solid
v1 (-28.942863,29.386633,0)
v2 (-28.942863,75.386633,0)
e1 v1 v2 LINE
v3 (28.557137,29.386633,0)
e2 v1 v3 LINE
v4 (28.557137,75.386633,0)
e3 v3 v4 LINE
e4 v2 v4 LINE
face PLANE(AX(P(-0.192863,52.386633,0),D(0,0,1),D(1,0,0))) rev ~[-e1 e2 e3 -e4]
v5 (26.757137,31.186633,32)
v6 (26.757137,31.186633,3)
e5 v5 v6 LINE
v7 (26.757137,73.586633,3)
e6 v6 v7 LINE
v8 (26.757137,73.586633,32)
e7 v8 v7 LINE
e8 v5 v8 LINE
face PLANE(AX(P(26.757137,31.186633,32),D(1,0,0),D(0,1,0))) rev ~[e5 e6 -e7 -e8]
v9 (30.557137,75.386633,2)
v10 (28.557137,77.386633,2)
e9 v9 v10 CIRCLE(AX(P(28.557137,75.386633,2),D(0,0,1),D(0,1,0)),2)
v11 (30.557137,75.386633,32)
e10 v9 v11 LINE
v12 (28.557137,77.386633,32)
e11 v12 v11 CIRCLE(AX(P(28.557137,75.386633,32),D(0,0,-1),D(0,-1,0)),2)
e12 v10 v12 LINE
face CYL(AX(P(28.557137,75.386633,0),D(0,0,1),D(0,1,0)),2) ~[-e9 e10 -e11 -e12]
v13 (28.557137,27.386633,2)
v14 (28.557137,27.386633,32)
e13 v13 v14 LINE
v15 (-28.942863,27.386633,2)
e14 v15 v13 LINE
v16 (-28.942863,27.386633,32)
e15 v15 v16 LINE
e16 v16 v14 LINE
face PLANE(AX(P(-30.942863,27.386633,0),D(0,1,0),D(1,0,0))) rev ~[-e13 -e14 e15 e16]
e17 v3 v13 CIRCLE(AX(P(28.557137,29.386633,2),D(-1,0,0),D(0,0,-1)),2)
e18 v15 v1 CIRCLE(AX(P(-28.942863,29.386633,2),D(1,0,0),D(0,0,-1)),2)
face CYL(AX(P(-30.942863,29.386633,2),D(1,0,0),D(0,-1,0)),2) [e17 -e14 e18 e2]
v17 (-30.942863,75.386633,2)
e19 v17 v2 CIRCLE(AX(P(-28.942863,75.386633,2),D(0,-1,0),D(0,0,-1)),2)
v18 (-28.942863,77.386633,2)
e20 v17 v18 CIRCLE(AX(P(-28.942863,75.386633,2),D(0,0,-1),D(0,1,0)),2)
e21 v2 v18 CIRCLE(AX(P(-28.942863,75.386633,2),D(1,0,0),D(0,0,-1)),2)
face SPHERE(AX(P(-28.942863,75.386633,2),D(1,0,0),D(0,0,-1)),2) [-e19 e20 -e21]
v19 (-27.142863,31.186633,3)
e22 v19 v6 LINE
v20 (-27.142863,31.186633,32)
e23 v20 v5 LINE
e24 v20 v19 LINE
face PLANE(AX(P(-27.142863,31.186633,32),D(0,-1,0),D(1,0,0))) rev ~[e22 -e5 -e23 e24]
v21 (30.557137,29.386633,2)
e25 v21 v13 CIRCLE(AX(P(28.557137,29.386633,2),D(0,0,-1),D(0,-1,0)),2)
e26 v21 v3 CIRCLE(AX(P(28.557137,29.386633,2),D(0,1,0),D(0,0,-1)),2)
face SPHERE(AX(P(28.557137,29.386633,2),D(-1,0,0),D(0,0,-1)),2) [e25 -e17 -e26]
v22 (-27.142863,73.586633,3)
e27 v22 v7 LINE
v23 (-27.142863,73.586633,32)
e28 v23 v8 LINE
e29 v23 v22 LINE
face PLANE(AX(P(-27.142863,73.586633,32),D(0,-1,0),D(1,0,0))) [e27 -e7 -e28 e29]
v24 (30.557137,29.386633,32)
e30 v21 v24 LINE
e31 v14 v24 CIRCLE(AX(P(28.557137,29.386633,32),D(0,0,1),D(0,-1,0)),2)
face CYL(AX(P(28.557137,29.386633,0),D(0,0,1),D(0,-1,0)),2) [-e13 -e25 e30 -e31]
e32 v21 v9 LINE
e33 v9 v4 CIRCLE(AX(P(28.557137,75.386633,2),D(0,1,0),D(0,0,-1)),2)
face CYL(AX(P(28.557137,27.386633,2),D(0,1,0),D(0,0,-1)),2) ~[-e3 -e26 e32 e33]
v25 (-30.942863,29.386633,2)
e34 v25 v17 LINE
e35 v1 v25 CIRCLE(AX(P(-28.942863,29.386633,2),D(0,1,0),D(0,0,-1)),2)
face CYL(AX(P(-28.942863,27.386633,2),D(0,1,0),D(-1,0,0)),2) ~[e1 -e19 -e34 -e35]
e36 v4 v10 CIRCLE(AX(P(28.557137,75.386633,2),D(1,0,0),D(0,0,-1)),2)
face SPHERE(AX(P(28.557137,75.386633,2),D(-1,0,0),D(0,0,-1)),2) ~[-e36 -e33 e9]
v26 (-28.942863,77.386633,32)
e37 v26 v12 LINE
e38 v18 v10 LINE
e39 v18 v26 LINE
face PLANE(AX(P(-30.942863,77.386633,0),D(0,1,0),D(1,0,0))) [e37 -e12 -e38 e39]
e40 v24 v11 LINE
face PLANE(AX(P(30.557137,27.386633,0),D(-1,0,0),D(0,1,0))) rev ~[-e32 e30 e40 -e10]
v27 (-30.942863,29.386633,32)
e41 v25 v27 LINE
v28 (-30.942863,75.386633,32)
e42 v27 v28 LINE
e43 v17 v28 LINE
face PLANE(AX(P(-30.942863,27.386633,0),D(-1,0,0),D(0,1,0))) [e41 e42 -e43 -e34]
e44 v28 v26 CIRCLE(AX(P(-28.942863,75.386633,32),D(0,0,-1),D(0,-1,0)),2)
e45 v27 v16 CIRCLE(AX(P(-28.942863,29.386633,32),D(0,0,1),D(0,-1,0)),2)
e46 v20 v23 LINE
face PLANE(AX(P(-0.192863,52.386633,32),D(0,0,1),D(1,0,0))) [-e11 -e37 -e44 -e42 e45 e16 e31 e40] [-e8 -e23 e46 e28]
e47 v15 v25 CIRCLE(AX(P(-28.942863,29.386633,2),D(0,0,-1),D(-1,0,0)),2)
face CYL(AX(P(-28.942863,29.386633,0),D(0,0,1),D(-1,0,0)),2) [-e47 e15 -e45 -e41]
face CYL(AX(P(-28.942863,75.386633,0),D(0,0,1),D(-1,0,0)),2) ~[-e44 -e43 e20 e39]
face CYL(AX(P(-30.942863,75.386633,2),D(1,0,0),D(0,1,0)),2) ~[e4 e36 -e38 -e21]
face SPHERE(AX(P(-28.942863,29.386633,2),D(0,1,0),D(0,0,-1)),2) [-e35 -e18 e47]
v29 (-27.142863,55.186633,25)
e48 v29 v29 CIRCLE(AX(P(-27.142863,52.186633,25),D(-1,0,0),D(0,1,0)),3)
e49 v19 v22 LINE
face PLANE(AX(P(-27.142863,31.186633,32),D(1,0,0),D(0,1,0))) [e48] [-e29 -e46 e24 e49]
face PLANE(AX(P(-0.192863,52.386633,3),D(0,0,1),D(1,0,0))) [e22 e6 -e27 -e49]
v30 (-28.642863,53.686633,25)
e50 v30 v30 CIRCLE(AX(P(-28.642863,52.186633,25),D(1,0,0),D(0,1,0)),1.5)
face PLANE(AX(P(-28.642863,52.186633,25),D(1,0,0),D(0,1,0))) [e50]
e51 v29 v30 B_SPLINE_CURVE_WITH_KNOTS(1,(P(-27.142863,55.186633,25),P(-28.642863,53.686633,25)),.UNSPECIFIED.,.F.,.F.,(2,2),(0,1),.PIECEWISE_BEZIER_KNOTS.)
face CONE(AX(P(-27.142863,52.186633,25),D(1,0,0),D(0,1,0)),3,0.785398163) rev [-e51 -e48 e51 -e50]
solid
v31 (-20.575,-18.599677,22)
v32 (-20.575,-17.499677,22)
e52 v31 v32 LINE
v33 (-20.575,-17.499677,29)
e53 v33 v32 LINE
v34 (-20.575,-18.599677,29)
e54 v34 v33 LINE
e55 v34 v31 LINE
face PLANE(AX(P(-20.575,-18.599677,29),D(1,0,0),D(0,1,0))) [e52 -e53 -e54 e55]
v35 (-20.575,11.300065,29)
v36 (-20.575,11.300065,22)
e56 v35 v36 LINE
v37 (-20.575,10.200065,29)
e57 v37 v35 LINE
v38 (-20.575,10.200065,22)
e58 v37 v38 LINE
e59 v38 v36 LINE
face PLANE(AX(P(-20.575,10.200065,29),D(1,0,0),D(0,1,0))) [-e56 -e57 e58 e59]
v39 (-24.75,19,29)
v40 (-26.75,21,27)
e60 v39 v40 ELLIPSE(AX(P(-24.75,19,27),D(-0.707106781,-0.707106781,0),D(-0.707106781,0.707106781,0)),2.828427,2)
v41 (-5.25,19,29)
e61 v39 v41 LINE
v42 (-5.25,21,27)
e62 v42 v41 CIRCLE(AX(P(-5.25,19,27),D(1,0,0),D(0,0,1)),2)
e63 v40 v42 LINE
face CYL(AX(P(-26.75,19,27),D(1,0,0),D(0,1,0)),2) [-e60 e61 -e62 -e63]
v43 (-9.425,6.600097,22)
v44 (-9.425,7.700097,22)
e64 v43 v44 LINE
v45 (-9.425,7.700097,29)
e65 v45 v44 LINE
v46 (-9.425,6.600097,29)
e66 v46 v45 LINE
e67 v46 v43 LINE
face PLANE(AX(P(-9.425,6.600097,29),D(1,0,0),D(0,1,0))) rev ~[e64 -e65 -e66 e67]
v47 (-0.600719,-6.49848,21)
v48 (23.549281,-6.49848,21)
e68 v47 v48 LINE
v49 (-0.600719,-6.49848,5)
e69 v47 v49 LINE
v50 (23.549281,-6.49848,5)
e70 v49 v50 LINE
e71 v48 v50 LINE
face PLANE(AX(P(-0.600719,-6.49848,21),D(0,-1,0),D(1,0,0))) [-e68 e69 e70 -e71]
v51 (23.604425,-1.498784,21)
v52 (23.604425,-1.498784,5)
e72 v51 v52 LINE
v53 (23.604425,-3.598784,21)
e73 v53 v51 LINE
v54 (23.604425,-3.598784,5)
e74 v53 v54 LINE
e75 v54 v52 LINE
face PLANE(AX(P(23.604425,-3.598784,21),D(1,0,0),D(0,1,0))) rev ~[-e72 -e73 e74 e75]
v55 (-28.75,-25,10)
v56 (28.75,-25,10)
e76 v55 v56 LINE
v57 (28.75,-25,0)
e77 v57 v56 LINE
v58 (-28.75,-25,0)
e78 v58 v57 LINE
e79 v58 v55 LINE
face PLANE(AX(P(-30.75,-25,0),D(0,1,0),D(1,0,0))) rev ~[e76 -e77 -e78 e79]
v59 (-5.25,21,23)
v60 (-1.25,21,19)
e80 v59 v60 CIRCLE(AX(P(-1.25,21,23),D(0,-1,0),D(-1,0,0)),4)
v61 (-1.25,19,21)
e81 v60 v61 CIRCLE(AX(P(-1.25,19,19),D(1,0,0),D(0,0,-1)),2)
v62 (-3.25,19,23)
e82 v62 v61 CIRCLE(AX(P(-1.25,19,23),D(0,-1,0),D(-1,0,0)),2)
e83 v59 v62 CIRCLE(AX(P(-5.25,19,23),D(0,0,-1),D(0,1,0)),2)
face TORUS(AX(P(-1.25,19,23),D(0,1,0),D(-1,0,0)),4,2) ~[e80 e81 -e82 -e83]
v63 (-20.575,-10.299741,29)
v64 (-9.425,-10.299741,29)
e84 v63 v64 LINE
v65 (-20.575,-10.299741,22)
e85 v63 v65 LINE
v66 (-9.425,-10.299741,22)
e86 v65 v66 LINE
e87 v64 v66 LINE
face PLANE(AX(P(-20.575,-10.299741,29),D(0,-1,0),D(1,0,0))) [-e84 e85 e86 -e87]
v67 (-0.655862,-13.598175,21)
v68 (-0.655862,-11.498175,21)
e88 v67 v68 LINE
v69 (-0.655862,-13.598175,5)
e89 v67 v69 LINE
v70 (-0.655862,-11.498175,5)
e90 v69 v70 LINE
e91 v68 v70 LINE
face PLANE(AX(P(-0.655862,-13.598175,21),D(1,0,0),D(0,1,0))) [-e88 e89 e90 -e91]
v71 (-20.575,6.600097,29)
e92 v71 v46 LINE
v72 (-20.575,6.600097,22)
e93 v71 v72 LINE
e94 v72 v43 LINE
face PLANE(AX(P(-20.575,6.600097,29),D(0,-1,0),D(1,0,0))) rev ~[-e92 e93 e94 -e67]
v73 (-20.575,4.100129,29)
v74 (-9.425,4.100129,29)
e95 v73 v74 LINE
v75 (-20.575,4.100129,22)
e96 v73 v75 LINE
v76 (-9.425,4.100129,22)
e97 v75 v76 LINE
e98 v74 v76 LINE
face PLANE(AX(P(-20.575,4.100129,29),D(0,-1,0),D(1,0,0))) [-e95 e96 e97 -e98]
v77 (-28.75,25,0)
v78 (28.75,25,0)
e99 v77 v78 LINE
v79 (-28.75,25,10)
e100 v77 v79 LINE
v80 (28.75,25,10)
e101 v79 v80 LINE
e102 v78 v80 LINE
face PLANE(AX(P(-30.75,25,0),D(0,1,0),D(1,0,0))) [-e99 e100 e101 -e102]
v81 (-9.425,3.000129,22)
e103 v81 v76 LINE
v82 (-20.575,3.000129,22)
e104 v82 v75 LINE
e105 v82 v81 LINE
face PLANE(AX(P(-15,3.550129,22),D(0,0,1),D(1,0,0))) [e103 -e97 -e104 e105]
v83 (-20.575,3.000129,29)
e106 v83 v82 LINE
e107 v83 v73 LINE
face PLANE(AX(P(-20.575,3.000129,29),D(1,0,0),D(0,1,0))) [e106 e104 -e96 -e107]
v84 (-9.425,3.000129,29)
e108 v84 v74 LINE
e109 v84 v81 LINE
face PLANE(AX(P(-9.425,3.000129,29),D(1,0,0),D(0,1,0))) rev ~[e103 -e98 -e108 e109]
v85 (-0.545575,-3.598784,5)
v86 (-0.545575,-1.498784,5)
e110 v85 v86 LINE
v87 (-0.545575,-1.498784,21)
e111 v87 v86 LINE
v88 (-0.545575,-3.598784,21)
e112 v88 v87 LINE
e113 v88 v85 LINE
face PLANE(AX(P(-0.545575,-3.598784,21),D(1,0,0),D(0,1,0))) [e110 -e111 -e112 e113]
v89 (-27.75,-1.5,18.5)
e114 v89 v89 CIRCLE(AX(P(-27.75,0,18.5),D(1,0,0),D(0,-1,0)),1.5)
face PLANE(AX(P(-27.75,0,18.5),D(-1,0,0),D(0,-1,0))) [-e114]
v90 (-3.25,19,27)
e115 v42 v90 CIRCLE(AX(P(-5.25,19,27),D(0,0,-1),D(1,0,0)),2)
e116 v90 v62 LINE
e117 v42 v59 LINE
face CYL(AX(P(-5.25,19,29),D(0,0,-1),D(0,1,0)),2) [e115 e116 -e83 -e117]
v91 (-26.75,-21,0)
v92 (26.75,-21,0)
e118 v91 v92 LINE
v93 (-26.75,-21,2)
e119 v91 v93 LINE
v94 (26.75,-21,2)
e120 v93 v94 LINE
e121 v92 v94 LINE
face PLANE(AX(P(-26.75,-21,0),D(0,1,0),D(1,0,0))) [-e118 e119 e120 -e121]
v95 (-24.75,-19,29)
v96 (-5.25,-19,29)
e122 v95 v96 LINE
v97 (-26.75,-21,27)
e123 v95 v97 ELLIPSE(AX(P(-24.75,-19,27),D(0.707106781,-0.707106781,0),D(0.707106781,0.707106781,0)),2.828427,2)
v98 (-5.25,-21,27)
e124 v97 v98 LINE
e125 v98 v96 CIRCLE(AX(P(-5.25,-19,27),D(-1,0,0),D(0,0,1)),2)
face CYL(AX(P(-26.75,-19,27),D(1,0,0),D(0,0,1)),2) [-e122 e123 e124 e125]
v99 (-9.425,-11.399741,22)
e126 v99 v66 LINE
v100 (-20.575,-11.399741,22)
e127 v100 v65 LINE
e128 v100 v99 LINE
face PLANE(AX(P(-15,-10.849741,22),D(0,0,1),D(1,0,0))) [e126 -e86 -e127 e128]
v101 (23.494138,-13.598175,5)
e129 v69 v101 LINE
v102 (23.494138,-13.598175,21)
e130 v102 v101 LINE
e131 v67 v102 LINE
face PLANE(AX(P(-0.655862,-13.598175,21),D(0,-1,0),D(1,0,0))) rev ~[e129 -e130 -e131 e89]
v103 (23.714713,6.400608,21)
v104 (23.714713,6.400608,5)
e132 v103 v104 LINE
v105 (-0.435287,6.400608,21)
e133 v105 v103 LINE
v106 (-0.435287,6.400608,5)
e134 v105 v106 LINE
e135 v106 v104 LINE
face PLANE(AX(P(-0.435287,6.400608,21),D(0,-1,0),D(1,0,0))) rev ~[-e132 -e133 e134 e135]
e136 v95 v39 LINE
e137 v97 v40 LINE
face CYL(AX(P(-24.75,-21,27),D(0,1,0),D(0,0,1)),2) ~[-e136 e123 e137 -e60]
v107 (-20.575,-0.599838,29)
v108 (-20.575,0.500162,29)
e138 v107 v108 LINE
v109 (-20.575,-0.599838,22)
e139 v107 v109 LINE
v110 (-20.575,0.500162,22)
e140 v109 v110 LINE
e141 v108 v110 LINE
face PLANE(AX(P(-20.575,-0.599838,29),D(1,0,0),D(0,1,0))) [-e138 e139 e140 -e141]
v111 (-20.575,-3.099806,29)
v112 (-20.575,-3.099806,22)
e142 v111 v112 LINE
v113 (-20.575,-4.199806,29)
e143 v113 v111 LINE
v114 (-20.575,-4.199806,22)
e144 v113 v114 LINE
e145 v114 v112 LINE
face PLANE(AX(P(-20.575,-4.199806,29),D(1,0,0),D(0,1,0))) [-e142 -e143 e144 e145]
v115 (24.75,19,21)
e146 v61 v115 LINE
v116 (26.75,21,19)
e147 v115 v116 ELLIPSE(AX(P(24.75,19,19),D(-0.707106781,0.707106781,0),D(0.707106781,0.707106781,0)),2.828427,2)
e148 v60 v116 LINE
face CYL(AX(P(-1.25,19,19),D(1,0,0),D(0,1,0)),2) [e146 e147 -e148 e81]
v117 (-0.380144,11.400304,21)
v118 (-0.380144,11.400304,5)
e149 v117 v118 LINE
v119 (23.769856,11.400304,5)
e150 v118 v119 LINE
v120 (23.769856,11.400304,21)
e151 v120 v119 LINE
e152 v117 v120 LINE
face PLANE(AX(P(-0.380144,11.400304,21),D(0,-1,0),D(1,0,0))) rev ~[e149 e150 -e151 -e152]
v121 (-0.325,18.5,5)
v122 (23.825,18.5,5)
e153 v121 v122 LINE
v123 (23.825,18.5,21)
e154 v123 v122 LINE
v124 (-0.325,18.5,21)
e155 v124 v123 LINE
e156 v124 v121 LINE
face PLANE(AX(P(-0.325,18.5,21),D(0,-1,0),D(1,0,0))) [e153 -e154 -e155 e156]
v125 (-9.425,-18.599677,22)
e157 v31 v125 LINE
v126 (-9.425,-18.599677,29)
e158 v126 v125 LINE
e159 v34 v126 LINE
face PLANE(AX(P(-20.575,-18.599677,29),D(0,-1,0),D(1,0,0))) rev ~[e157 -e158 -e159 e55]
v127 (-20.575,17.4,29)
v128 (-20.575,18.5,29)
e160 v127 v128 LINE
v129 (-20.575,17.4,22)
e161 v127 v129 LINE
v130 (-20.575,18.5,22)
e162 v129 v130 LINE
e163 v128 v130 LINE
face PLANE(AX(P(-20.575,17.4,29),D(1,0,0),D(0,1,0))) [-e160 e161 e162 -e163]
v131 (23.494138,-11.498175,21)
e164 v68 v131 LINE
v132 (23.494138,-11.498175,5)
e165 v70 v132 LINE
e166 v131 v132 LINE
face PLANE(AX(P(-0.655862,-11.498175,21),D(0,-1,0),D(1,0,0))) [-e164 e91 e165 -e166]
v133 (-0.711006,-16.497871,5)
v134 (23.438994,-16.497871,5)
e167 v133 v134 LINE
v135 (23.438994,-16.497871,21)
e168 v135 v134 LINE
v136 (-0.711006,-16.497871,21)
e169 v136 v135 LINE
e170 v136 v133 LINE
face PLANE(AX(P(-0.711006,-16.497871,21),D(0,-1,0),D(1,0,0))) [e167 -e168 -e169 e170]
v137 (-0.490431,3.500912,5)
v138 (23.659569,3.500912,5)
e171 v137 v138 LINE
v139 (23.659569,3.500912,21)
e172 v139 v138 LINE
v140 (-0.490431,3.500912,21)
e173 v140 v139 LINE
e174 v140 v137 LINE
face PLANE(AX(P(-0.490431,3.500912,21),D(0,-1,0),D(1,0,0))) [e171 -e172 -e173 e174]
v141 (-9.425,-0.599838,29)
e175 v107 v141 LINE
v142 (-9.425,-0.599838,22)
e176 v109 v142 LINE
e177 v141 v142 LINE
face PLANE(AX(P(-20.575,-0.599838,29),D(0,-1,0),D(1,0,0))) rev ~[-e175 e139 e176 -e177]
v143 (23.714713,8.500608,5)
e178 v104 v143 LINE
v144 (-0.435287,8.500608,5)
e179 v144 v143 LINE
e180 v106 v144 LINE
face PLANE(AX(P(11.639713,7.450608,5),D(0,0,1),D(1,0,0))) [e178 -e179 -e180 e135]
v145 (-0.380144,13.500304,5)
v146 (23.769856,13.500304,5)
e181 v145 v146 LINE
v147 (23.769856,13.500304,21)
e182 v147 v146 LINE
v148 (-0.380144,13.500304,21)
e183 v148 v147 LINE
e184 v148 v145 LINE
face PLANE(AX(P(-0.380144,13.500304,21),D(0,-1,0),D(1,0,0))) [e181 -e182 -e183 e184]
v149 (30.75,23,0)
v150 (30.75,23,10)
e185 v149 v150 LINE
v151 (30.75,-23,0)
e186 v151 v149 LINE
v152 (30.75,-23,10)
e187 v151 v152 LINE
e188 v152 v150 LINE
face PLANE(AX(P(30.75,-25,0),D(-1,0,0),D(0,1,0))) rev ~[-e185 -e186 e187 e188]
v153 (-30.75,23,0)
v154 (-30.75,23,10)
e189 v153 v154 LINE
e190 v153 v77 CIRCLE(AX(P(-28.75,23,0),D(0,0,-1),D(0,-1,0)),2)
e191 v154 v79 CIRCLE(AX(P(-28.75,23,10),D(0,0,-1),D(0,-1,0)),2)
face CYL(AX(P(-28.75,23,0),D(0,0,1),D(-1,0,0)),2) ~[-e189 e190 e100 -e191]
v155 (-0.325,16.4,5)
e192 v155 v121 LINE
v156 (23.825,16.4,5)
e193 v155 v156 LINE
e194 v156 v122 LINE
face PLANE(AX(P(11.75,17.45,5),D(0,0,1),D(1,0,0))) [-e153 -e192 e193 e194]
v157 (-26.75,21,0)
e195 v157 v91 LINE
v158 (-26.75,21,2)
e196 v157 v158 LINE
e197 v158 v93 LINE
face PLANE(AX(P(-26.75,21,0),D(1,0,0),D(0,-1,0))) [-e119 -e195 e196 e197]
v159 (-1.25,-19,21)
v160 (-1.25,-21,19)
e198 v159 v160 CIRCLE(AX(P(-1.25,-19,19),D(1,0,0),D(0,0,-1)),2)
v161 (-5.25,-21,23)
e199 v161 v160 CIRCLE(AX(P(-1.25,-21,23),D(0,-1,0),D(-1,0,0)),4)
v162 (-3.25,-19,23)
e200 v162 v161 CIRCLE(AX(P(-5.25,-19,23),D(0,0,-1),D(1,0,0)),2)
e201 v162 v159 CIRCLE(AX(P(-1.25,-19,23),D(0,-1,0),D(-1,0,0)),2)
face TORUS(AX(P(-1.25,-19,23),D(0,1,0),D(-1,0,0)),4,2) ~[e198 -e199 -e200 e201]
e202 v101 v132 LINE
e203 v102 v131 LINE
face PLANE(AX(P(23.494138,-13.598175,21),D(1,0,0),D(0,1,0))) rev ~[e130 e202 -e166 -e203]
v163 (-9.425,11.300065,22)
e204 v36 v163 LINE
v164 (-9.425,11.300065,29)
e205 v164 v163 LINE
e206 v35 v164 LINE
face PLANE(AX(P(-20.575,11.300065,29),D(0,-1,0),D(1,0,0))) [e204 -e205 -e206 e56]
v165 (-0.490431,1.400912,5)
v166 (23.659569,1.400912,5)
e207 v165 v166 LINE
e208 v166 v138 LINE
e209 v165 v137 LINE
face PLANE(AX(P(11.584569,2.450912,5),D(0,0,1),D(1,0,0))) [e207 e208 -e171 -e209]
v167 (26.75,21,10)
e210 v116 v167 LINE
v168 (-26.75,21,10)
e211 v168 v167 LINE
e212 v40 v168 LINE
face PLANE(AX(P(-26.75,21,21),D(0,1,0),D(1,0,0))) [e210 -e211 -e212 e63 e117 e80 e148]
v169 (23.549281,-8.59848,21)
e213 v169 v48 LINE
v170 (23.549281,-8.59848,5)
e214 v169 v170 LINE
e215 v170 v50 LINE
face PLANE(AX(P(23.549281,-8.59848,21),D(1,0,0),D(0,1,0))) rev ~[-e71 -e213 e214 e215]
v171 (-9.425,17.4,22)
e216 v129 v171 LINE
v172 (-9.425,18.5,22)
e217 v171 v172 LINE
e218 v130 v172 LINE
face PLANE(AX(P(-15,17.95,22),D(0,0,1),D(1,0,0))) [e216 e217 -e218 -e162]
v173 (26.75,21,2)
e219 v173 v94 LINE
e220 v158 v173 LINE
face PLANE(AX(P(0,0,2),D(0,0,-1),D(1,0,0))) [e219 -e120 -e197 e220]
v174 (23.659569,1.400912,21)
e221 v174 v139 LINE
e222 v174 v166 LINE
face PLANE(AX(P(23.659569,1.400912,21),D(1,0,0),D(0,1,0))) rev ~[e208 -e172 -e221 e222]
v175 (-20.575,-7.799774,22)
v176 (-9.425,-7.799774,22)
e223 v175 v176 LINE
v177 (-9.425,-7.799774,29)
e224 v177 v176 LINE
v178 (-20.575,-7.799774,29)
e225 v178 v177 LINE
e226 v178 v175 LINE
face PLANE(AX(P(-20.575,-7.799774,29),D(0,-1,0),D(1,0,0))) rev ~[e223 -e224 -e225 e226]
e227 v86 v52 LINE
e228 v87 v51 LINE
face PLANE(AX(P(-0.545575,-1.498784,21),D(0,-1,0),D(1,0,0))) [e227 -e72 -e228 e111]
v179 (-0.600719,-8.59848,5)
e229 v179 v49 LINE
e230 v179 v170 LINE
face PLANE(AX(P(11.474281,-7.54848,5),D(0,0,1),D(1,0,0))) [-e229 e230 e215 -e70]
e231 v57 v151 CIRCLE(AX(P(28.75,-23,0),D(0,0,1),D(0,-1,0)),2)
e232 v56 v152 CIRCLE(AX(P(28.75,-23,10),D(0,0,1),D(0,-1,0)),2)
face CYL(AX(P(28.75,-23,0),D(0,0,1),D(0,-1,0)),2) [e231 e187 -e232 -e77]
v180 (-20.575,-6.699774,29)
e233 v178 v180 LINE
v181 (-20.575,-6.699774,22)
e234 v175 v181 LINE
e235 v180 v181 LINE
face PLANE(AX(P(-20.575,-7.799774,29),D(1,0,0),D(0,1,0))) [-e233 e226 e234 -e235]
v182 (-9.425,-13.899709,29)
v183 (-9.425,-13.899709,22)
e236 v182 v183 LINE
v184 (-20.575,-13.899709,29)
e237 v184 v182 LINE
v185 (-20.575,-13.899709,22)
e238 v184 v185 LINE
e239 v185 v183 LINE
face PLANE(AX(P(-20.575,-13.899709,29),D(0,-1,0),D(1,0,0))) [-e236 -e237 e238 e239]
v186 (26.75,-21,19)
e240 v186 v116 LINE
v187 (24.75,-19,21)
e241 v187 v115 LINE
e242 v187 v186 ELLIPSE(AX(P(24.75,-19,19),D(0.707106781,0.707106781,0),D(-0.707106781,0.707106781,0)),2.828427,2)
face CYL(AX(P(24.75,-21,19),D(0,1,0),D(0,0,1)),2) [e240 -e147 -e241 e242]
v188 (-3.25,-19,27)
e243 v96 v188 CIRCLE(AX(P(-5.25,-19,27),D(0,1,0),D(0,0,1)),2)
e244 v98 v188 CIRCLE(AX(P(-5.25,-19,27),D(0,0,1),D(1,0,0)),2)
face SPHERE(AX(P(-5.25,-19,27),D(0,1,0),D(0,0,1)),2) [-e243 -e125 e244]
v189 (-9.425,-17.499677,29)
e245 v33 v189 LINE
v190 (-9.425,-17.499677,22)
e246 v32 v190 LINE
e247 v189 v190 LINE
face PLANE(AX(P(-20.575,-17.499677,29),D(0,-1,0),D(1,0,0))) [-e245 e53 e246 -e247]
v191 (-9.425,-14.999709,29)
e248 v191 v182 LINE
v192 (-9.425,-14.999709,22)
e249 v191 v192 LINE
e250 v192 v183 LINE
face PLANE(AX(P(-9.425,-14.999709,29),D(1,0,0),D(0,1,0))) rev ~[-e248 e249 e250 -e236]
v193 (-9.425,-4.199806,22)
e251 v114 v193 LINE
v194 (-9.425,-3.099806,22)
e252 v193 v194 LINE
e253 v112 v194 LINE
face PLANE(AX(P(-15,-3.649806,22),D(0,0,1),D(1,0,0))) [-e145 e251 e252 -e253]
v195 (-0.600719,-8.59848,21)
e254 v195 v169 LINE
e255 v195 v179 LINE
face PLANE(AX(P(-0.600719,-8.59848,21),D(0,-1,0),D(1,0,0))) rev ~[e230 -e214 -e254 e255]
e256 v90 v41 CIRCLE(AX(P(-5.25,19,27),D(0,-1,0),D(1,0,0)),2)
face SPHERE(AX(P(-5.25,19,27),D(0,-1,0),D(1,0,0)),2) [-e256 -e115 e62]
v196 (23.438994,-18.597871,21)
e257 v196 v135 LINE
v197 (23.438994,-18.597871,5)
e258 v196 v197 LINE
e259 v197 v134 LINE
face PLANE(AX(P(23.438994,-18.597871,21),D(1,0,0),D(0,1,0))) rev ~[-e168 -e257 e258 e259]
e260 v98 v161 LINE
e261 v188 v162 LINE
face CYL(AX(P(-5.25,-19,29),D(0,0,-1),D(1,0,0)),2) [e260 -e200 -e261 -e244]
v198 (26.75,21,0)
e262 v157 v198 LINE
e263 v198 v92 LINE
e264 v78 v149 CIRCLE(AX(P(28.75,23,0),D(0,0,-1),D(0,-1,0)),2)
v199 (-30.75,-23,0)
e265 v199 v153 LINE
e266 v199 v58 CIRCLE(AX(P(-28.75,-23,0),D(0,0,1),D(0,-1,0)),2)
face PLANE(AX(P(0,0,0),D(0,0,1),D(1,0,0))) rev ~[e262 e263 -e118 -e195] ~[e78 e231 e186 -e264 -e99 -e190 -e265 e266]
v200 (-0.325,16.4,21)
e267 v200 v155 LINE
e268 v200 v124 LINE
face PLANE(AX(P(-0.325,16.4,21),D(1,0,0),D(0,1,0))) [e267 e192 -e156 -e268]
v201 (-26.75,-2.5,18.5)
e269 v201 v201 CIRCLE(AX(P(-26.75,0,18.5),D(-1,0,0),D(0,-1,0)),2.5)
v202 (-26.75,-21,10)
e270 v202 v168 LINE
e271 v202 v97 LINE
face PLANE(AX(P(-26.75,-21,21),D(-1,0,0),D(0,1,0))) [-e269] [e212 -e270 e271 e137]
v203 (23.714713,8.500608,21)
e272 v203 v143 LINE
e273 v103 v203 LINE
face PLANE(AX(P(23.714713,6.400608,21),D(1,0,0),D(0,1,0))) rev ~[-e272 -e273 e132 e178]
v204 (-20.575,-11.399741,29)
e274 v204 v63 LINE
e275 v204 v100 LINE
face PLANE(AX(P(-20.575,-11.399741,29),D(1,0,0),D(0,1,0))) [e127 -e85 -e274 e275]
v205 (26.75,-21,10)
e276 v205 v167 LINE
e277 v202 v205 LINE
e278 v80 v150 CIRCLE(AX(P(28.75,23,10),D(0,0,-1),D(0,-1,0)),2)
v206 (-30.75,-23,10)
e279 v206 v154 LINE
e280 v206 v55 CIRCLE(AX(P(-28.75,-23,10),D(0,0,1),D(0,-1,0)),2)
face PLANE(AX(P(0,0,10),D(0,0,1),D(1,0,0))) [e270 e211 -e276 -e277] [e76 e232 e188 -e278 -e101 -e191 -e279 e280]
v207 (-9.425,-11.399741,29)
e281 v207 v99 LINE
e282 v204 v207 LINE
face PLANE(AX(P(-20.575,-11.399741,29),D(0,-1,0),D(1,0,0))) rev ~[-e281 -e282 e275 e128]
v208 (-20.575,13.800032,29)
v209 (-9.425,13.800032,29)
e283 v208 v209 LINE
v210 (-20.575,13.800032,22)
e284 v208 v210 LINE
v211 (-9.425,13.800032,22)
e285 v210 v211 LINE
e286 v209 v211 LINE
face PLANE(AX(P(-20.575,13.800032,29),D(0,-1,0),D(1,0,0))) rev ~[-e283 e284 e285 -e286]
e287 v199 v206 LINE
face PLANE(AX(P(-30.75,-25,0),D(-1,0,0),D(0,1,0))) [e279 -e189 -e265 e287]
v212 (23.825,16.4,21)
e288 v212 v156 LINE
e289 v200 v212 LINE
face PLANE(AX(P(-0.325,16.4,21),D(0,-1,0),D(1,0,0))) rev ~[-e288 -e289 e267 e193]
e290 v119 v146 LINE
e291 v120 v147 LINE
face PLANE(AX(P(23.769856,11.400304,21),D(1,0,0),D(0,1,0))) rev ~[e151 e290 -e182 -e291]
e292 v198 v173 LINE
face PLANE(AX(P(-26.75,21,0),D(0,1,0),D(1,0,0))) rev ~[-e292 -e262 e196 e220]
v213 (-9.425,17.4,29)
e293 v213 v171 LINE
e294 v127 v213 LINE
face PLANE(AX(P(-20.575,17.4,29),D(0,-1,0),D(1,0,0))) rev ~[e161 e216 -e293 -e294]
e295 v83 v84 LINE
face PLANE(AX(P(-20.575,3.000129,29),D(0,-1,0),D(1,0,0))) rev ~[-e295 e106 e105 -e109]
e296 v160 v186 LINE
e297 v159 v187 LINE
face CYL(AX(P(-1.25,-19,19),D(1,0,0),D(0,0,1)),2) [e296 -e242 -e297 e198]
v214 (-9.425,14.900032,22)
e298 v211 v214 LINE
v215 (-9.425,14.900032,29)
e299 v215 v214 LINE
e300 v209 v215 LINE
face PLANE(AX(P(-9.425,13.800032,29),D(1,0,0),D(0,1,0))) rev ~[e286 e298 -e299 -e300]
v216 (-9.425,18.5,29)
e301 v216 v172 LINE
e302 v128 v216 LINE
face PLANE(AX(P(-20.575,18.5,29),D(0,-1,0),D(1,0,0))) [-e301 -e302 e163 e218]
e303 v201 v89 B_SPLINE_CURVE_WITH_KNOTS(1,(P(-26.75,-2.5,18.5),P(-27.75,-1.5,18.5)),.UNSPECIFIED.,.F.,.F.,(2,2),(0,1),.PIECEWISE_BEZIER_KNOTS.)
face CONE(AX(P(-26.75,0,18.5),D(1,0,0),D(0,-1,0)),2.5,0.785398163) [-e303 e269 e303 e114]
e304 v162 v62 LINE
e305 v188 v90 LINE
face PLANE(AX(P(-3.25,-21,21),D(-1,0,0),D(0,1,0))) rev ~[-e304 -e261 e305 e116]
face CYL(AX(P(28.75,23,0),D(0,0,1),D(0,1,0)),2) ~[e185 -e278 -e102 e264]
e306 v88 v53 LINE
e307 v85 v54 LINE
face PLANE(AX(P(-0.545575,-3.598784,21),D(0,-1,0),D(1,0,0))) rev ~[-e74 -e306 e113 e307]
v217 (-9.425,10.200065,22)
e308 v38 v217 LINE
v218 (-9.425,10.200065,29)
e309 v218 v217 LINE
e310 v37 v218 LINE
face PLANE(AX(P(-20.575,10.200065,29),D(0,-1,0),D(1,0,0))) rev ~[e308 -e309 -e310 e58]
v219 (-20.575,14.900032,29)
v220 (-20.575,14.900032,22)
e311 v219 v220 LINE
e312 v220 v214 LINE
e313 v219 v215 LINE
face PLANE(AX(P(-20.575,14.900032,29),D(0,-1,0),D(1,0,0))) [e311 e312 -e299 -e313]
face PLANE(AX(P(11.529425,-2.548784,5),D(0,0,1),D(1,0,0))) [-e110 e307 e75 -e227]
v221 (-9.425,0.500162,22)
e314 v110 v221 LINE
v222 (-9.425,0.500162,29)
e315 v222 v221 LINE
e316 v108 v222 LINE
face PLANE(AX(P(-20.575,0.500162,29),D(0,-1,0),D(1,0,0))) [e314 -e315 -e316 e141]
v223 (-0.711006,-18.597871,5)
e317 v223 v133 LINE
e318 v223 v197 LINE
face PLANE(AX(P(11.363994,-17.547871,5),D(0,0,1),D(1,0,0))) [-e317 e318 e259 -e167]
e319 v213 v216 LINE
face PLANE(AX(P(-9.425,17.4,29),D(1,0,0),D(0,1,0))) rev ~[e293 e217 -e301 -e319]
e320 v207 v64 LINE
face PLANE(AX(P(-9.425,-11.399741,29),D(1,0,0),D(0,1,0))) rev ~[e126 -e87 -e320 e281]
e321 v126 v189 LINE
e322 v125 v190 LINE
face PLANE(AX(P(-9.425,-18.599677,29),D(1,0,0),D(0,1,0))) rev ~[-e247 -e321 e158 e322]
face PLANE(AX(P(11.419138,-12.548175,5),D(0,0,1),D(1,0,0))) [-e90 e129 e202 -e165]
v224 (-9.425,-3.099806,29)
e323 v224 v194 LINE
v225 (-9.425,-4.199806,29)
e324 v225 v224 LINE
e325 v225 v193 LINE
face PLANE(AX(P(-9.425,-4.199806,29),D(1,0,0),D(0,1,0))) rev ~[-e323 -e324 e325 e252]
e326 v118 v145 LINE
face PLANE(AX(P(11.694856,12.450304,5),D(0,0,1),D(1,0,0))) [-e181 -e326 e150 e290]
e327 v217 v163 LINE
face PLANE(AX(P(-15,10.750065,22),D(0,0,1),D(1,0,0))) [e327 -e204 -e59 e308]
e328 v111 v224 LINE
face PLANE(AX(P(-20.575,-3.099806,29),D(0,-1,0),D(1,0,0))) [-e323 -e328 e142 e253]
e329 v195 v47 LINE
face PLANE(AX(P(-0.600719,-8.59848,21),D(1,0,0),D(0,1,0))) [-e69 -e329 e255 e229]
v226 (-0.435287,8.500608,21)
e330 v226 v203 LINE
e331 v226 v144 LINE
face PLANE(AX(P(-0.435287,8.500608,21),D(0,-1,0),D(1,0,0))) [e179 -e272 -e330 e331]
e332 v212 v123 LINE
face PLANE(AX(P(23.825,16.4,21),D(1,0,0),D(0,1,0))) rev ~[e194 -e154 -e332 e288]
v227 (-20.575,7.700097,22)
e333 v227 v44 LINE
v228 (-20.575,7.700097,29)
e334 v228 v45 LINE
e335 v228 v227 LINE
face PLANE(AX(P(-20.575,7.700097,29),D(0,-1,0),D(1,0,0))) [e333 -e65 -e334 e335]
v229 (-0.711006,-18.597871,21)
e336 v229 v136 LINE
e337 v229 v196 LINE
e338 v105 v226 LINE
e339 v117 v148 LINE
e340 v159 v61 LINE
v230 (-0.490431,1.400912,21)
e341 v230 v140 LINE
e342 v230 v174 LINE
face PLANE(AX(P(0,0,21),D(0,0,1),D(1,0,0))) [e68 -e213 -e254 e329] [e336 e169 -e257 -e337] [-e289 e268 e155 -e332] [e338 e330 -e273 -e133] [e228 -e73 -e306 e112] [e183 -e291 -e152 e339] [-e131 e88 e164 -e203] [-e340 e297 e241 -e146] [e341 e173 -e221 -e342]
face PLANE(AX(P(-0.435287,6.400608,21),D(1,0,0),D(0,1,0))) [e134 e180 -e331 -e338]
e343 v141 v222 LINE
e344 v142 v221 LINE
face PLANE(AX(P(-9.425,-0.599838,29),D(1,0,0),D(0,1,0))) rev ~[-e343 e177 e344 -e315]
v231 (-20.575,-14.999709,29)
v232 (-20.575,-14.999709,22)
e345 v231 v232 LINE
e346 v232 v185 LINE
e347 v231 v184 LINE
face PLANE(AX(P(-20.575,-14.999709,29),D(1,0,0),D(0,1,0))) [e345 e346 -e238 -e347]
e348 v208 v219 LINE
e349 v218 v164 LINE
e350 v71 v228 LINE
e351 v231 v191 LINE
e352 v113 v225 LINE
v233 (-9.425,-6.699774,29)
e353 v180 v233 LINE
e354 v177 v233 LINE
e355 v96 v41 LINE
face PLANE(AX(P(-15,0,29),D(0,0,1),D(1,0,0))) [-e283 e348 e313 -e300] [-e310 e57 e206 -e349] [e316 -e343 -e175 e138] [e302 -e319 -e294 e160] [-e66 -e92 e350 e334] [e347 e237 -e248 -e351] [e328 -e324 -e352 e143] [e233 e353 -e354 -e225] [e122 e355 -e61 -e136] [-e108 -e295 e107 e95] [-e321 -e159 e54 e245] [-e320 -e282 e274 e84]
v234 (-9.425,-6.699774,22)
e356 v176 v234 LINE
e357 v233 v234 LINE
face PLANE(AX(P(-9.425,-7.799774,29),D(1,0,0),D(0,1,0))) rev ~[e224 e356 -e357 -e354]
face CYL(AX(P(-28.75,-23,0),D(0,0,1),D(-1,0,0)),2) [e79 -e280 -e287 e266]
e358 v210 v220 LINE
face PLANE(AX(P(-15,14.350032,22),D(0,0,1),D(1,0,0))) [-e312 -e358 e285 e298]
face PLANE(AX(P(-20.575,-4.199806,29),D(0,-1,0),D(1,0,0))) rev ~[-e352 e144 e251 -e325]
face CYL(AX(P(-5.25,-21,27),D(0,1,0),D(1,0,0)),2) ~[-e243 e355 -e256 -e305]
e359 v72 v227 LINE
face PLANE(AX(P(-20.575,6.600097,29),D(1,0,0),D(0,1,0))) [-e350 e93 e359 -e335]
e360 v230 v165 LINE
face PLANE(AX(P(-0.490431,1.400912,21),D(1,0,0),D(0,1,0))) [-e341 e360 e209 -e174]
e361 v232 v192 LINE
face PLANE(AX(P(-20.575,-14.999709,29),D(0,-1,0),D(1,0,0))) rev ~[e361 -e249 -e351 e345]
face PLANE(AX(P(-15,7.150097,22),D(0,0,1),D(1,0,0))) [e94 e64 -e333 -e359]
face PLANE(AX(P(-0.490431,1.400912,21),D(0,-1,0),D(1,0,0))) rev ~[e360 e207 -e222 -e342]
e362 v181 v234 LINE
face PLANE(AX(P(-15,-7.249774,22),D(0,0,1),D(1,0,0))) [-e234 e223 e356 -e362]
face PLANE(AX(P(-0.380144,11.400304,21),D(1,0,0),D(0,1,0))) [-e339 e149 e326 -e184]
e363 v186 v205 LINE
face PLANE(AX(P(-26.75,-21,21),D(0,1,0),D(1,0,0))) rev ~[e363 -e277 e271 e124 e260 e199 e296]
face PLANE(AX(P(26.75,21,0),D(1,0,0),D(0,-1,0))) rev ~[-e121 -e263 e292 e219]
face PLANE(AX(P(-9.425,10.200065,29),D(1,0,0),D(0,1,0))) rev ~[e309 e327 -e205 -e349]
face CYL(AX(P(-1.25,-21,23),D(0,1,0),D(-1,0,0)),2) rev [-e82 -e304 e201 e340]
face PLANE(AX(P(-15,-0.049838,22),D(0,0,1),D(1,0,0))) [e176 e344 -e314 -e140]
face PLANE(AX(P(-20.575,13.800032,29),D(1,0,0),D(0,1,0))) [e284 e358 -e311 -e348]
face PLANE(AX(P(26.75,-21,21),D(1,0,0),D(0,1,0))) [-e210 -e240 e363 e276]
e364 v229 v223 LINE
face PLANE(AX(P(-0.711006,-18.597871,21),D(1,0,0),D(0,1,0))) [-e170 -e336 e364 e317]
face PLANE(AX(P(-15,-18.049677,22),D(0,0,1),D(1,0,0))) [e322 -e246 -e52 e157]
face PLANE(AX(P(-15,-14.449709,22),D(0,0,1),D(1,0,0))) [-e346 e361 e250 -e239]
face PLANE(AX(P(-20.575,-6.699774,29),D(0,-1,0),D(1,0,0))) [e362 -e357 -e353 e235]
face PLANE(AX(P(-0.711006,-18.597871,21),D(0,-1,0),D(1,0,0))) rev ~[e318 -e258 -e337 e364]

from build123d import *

# Parameters (mm, degrees)
F0_W      = 61.5
F0_H      = 50
F1_DEPTH  = 21
F2_W      = 61.5
F2_H      = 50
F2_W_2    = 53.5
F2_H_2    = 42
F3_DEPTH  = 11
F4_W      = 23.5
F4_H      = 42
F5_DEPTH  = 8
F6_W      = 11.15
F6_H      = 1.1
F7_DEPTH  = 7
F8_W      = 24.15
F8_H      = 2.1
F9_DEPTH  = 16
F10_F1_R  = 2
F10_F2_R  = 2
F11_W     = 61.5
F11_H     = 50
F12_DEPTH = 32
F13_W     = 53.9
F13_H     = 42.4
F14_DEPTH = 29
F15_R     = 2.5
F16_DEPTH = 1
F16_TAPER = 45
F17_R     = 3
F18_DEPTH = 1.5
F18_TAPER = 45
F19_R     = 2
F20_W     = 53.5
F20_H     = 42
F21_DEPTH = 2


with BuildPart() as f1:
    # F0 (on Top) → F1 (new body)
    with BuildSketch(Plane.XY):
        Rectangle(F0_W, F0_H)
    extrude(amount=F1_DEPTH)

    # F2 (on face) → F3 (cut)
    with BuildSketch(Plane.XY.offset(21)):
        Rectangle(F2_W, F2_H)
        Rectangle(F2_W_2, F2_H_2, mode=Mode.SUBTRACT)
    extrude(amount=-F3_DEPTH, mode=Mode.SUBTRACT)

    # F4 (on face) → F5 (join)
    with BuildSketch(Plane.XY.offset(21)):
        with Locations((-15, 0)):
            Rectangle(F4_W, F4_H)
    extrude(amount=F5_DEPTH)

    # F6 (on face) → F7 (cut)
    with BuildSketch(Plane.XY.offset(29)):
        with Locations((-15, 17.95)):
            Rectangle(F6_W, F6_H)
        with Locations((-15, 14.3500323179)):
            Rectangle(F6_W, F6_H)
        with Locations((-15, 10.7500646357)):
            Rectangle(F6_W, F6_H)
        with Locations((-15, 7.1500969536)):
            Rectangle(F6_W, F6_H)
        with Locations((-15, 3.5501292715)):
            Rectangle(F6_W, F6_H)
        with Locations((-15, -0.0498384107)):
            Rectangle(F6_W, F6_H)
        with Locations((-15, -3.6498060928)):
            Rectangle(F6_W, F6_H)
        with Locations((-15, -7.249773775)):
            Rectangle(F6_W, F6_H)
        with Locations((-15, -10.8497414571)):
            Rectangle(F6_W, F6_H)
        with Locations((-15, -14.4497091392)):
            Rectangle(F6_W, F6_H)
        with Locations((-15, -18.0496768214)):
            Rectangle(F6_W, F6_H)
    extrude(amount=-F7_DEPTH, mode=Mode.SUBTRACT)

    # F8 (on face) → F9 (cut)
    with BuildSketch(Plane.XY.offset(21)):
        with Locations((11.75, 17.45)):
            Rectangle(F8_W, F8_H)
        with Locations((11.6948562951, 12.4503040921)):
            Rectangle(F8_W, F8_H)
        with Locations((11.6397125903, 7.4506081841)):
            Rectangle(F8_W, F8_H)
        with Locations((11.5845688854, 2.4509122762)):
            Rectangle(F8_W, F8_H)
        with Locations((11.5294251805, -2.5487836317)):
            Rectangle(F8_W, F8_H)
        with Locations((11.4742814757, -7.5484795397)):
            Rectangle(F8_W, F8_H)
        with Locations((11.4191377708, -12.5481754476)):
            Rectangle(F8_W, F8_H)
        with Locations((11.3639940659, -17.5478713555)):
            Rectangle(F8_W, F8_H)
    extrude(amount=-F9_DEPTH, mode=Mode.SUBTRACT)

    # F10: fillet of radius 2 on 12 edges, made by hand

    # F10_f1
    f10_f1_edges = [f1.edges().sort_by_distance(p)[0] for p in [
        (-3.25, 0, 21),
    ]]
    fillet(f10_f1_edges, radius=F10_F1_R)

    # F10_f2
    f10_f2_edges = [f1.edges().sort_by_distance(p)[0] for p in [
        (-3.25, 0, 29),
        (26.75, 0, 21),
        (-26.75, 0, 29),
        (-30.75, -25, 5),
        (-30.75, 25, 5),
        (30.75, -25, 5),
        (30.75, 25, 5),
        (-15, -21, 29),
        (12.75, -21, 21),
        (12.75, 21, 21),
        (-15, 21, 29),
        (-2.6642135624, 21, 21.5857864376),
        (-2.6642135624, -21, 21.5857864376),
    ]]
    fillet(f10_f2_edges, radius=F10_F2_R)

    # F15 (on face) → F16 (join)
    with BuildSketch(Plane(origin=(-26.75, 0, 0), x_dir=(0, -1, 0), z_dir=(-1, 0, 0))):
        with Locations((0, 18.5)):
            Circle(F15_R)
    extrude(amount=F16_DEPTH, taper=F16_TAPER)

    # F20 (on face) → F21 (cut)
    with BuildSketch(Plane(origin=(0, 0, 0), x_dir=(1, 0, 0), z_dir=(0, 0, -1))):
        Rectangle(F20_W, F20_H)
    extrude(amount=-F21_DEPTH, mode=Mode.SUBTRACT)


with BuildPart() as f12:
    # F11 (on Top) → F12 (new body)
    with BuildSketch(Plane.XY):
        with Locations((-0.1928630173, 52.3866325617)):
            Rectangle(F11_W, F11_H)
    extrude(amount=F12_DEPTH)

    # F13 (on face) → F14 (cut)
    with BuildSketch(Plane.XY.offset(32)):
        with Locations((-0.1928630173, 52.3866325617)):
            Rectangle(F13_W, F13_H)
    extrude(amount=-F14_DEPTH, mode=Mode.SUBTRACT)

    # F17 (on face) → F18 (cut)
    with BuildSketch(Plane.YZ.offset(-27.1428630173)):
        with Locations((52.1866325617, 25)):
            Circle(F17_R)
    extrude(amount=-F18_DEPTH, taper=F18_TAPER, mode=Mode.SUBTRACT)

    # F19
    f19_edges = [f12.edges().sort_by_distance(p)[0] for p in [
        (-0.192863, 77.386633, 0),
        (-30.942863, 52.386633, 0),
        (-0.192863, 27.386633, 0),
        (30.557137, 52.386633, 0),
        (-30.942863, 77.386633, 16),
        (-30.942863, 27.386633, 16),
        (30.557137, 27.386633, 16),
        (30.557137, 77.386633, 16),
    ]]
    fillet(f19_edges, radius=F19_R)


solid = Compound([f1.part, f12.part])
